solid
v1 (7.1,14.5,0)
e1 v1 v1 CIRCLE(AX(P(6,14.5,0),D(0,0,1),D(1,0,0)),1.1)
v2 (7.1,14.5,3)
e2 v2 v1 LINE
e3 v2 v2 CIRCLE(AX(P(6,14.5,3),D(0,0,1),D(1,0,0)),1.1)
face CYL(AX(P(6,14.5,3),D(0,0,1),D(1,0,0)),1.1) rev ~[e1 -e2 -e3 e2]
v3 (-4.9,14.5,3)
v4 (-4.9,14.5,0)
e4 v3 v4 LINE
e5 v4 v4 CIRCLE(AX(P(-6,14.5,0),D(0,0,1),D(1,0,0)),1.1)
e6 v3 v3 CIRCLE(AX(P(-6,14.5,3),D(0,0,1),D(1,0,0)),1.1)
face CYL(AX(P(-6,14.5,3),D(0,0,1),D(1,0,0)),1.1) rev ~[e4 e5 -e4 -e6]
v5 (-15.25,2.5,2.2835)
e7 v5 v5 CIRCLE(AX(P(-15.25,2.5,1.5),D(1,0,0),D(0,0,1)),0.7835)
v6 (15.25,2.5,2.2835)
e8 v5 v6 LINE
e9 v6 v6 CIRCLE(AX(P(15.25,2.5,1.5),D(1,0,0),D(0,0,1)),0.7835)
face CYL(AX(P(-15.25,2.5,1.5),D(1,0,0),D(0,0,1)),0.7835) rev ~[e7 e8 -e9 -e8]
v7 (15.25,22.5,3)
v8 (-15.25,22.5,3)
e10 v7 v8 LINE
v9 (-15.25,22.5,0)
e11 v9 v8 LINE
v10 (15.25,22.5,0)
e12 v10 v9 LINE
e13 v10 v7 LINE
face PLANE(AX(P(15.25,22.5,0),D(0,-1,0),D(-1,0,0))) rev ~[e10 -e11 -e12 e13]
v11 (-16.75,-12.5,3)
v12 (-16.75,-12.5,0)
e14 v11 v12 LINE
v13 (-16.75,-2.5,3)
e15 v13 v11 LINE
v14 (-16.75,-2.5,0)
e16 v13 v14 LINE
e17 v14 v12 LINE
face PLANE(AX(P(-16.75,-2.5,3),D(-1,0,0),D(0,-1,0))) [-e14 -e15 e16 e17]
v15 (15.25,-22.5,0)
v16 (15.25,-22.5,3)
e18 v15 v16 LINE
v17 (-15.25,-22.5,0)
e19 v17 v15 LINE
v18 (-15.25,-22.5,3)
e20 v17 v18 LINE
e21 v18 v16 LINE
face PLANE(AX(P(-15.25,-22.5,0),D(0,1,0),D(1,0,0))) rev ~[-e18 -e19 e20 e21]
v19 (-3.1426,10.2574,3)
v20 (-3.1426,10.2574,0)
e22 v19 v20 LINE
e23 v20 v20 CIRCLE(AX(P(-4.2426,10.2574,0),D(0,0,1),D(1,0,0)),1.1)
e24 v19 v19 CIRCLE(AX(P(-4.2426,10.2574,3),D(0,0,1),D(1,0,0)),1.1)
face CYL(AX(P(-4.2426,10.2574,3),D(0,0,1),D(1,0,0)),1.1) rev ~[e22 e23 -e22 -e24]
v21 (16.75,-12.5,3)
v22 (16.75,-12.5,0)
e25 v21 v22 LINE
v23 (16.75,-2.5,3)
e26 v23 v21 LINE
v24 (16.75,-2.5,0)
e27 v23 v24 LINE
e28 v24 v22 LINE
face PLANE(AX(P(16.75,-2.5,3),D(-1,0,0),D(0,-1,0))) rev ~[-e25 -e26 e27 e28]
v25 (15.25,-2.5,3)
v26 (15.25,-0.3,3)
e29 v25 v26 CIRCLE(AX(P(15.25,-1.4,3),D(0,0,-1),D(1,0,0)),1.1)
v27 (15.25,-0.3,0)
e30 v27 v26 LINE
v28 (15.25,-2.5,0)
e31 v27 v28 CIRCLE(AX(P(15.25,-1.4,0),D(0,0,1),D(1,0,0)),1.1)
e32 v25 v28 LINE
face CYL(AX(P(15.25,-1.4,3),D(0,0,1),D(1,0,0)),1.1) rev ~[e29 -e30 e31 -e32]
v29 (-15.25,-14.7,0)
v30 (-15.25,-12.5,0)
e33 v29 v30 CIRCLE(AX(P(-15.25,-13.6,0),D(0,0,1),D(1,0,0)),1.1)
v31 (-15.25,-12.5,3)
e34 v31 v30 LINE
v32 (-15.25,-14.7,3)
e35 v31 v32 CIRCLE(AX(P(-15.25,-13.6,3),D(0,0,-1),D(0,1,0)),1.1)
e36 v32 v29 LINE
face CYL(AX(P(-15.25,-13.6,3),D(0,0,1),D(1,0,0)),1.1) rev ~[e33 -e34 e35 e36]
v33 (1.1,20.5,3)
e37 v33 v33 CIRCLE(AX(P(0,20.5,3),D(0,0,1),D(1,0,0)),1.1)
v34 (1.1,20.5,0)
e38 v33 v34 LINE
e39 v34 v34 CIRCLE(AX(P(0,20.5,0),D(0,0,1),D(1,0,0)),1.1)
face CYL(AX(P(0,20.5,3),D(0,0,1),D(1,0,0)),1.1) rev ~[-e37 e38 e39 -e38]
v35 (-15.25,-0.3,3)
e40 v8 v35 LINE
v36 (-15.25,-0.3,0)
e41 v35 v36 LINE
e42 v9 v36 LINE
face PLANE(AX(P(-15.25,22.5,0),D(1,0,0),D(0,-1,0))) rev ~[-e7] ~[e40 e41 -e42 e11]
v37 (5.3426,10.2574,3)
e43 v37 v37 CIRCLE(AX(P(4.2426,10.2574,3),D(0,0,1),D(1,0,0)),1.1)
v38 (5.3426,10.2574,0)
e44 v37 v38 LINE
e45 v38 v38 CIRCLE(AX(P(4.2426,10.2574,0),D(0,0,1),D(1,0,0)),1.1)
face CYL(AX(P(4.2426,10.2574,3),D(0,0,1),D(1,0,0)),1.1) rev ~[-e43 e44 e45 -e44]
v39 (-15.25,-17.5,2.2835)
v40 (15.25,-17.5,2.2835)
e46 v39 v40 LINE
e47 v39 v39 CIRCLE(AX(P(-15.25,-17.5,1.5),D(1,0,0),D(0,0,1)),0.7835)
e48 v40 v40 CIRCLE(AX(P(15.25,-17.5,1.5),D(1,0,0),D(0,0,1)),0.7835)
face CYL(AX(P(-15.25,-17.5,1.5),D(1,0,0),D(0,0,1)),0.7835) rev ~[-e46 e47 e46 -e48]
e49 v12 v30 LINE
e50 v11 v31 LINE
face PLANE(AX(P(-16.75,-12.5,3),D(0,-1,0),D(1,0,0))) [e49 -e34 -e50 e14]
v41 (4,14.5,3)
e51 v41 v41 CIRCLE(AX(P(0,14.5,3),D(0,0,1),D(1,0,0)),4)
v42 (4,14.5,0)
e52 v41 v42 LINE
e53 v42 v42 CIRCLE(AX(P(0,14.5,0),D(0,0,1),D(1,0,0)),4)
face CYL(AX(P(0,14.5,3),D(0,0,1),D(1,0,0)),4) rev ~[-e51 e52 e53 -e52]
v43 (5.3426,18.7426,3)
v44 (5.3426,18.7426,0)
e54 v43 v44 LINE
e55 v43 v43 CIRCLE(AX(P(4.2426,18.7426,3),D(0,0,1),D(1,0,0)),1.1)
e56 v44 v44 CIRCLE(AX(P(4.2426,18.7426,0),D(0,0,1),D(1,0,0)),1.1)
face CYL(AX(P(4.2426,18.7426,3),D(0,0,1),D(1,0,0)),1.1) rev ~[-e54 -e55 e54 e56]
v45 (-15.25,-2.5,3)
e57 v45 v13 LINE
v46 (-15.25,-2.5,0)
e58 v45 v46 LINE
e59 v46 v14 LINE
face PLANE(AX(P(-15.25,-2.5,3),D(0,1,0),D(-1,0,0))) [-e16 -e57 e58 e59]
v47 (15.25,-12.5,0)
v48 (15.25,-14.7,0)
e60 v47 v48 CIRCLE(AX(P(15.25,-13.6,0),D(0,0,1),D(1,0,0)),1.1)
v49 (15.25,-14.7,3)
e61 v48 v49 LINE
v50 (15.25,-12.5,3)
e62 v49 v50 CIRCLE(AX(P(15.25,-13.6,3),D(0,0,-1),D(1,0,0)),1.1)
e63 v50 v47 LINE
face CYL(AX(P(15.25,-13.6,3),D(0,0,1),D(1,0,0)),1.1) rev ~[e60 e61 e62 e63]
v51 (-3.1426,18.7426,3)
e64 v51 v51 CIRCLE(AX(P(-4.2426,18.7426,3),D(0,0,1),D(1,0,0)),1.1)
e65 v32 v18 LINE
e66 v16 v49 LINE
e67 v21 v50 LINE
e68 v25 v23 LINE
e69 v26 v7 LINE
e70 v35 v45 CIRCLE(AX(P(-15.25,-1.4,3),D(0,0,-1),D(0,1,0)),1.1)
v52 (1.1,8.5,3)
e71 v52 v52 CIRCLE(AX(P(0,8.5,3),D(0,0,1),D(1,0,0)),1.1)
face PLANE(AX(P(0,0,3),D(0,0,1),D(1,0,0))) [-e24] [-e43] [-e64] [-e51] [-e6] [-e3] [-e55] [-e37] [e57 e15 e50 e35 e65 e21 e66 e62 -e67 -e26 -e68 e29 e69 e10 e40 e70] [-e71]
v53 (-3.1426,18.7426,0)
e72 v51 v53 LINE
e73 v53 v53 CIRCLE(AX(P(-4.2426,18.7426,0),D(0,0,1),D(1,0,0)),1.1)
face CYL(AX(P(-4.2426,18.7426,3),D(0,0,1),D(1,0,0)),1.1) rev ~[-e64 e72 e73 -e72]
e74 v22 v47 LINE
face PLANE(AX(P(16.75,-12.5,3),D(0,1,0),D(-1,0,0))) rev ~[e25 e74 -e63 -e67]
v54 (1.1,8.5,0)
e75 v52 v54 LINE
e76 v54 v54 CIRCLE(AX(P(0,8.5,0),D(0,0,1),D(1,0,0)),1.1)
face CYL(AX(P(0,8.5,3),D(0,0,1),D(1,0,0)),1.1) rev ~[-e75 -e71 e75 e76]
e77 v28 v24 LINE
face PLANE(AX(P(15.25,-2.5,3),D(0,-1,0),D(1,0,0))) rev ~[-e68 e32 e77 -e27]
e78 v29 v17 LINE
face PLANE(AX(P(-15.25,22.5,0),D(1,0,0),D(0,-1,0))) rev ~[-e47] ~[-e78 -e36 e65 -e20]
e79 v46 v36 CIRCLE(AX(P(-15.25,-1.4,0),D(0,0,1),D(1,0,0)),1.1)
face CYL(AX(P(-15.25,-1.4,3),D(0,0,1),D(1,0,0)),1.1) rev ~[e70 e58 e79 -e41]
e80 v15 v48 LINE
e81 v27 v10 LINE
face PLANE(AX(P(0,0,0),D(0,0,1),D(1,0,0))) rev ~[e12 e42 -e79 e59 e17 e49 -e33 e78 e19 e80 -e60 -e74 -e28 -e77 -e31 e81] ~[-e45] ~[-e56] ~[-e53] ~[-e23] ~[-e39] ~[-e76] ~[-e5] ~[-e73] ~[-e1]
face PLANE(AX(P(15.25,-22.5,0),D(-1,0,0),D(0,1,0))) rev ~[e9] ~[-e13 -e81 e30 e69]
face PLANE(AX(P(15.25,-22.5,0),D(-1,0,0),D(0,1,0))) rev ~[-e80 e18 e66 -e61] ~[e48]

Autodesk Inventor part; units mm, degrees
ref_plane "YZ Plane" through (0, 0, 0) normal (1, 0, 0) x (0, 1, 0)
ref_plane "XZ Plane" through (0, 0, 0) normal (0, 1, 0) x (-1, 0, 0)
ref_plane "XY Plane" through (0, 0, 0) normal (0, 0, 1) x (1, 0, 0)
sketch "スケッチ1" plane through (0, 0, 0) normal (0, 0, 1) x (1, 0, 0)
  line L0 (-15.25, -22.5) -> (15.25, -22.5)
  line L1 (15.25, -22.5) -> (15.25, 22.5)
  line L2 (15.25, 22.5) -> (-15.25, 22.5)
  line L3 (-15.25, 22.5) -> (-15.25, -22.5)
  line L4 (-15.25, -22.5) -> (15.25, 22.5) construction
  line L5 (15.25, -22.5) -> (-15.25, 22.5) construction
  point P0 (0, 0)
  dimension "d0" = 30.5
  dimension "d1" = 45
extrude "押し出し1" add sketch "スケッチ1" along normal blind 3
sketch "スケッチ2" plane through (0, 0, 3) normal (0, 0, 1) x (1, 0, 0)
  line L0 (-15.25, -2.5) -> (-16.75, -2.5)
  line L1 (-16.75, -2.5) -> (-16.75, -12.5)
  line L2 (-16.75, -12.5) -> (-15.25, -12.5)
  line L3 (-15.25, -12.5) -> (-15.25, -2.5)
  line L4 (-15.25, 22.5) -> (-15.25, -22.5) projected
  line L5 (-15.25, -22.5) -> (15.25, -22.5) projected
  circle A0 centre (-15.25, -13.6) radius 1.1
  circle A1 centre (-15.25, -1.4) radius 1.1
  line L6 (15.25, 22.5) -> (-15.25, 22.5) construction
  line L7 (0, 22.5) -> (0, 0) construction
  line L8 (15.25, -2.5) -> (16.75, -2.5)
  line L9 (16.75, -2.5) -> (16.75, -12.5)
  line L10 (16.75, -12.5) -> (15.25, -12.5)
  line L11 (15.25, -12.5) -> (15.25, -2.5)
  circle A2 centre (15.25, -13.6) radius 1.1
  circle A3 centre (15.25, -1.4) radius 1.1
  point P0 (-15.25, -0.3)
  point P1 (-15.25, -14.7)
  dimension "d7" = 2.2
  dimension "d4" = 10
  dimension "d5" = 1.5
  dimension "d6" = 10
extrude "押し出し2" add sketch "スケッチ2" against normal up to surface (3 mm away) contours L3 L2 L1 L0 | L8 L9 L10 L11
extrude "押し出し3" cut sketch "スケッチ2" against normal through all contours A0 L4 | L4 A1 | A2 | A3 picked at (-14.7226, -13.8557) picked at (-14.9196, -1.2409)
sketch "スケッチ3" plane through (-15.25, 22.5, 0) normal (-1, 0, 0) x (0, 0, 1)
  line L0 (3, -25) -> (0, -25) projected
  line L1 (3, -35) -> (0, -35) projected
  point P0 (0, -22.5)
  point P1 (1.5, -20)
  point P2 (1.5, -40)
  point P3 (1.5, -25)
  point P4 (1.5, -35)
  point P5 (1.5, -25)
  point P6 (1.5, -35)
  dimension "d12" = 5
  dimension "d13" = 5
hole "穴1" at (-15.25, 2.5, 1.5) at (-15.25, -17.5, 1.5) direction (1, 0, 0) diameter 1.567 end through all thread size "M2x0.4" class "6H" standard "ISO Metric profile"
sketch "スケッチ4" plane through (0, 0, 3) normal (0, 0, 1) x (1, 0, 0)
  circle A0 centre (0, 14.5) radius 8
  line L0 (15.25, 22.5) -> (-15.25, 22.5) projected
  circle A1 centre (0, 14.5) radius 4
  circle A2 centre (0, 14.5) radius 6 construction
  circle A3 centre (0, 8.5) radius 1.1
  circle A4 centre (4.2426, 10.2574) radius 1.1
  circle A5 centre (6, 14.5) radius 1.1
  circle A6 centre (4.2426, 18.7426) radius 1.1
  circle A7 centre (0, 20.5) radius 1.1
  circle A8 centre (-4.2426, 18.7426) radius 1.1
  circle A9 centre (-6, 14.5) radius 1.1
  circle A10 centre (-4.2426, 10.2574) radius 1.1
  point P0 (0, 0)
  point P1 (0, 22.5)
  dimension "d23" = 12
  dimension "d21" = 16
  dimension "d22" = 8
  dimension "d24" = 2.2
  dimension "d27" = 360
extrude "押し出し4" cut sketch "スケッチ4" against normal through all contours A1 | A3 | A4 | A5 | A6 | A7 | A8 | A9 | A10
equation "\"d13\" = d12"
properties part number "kosiyo"
